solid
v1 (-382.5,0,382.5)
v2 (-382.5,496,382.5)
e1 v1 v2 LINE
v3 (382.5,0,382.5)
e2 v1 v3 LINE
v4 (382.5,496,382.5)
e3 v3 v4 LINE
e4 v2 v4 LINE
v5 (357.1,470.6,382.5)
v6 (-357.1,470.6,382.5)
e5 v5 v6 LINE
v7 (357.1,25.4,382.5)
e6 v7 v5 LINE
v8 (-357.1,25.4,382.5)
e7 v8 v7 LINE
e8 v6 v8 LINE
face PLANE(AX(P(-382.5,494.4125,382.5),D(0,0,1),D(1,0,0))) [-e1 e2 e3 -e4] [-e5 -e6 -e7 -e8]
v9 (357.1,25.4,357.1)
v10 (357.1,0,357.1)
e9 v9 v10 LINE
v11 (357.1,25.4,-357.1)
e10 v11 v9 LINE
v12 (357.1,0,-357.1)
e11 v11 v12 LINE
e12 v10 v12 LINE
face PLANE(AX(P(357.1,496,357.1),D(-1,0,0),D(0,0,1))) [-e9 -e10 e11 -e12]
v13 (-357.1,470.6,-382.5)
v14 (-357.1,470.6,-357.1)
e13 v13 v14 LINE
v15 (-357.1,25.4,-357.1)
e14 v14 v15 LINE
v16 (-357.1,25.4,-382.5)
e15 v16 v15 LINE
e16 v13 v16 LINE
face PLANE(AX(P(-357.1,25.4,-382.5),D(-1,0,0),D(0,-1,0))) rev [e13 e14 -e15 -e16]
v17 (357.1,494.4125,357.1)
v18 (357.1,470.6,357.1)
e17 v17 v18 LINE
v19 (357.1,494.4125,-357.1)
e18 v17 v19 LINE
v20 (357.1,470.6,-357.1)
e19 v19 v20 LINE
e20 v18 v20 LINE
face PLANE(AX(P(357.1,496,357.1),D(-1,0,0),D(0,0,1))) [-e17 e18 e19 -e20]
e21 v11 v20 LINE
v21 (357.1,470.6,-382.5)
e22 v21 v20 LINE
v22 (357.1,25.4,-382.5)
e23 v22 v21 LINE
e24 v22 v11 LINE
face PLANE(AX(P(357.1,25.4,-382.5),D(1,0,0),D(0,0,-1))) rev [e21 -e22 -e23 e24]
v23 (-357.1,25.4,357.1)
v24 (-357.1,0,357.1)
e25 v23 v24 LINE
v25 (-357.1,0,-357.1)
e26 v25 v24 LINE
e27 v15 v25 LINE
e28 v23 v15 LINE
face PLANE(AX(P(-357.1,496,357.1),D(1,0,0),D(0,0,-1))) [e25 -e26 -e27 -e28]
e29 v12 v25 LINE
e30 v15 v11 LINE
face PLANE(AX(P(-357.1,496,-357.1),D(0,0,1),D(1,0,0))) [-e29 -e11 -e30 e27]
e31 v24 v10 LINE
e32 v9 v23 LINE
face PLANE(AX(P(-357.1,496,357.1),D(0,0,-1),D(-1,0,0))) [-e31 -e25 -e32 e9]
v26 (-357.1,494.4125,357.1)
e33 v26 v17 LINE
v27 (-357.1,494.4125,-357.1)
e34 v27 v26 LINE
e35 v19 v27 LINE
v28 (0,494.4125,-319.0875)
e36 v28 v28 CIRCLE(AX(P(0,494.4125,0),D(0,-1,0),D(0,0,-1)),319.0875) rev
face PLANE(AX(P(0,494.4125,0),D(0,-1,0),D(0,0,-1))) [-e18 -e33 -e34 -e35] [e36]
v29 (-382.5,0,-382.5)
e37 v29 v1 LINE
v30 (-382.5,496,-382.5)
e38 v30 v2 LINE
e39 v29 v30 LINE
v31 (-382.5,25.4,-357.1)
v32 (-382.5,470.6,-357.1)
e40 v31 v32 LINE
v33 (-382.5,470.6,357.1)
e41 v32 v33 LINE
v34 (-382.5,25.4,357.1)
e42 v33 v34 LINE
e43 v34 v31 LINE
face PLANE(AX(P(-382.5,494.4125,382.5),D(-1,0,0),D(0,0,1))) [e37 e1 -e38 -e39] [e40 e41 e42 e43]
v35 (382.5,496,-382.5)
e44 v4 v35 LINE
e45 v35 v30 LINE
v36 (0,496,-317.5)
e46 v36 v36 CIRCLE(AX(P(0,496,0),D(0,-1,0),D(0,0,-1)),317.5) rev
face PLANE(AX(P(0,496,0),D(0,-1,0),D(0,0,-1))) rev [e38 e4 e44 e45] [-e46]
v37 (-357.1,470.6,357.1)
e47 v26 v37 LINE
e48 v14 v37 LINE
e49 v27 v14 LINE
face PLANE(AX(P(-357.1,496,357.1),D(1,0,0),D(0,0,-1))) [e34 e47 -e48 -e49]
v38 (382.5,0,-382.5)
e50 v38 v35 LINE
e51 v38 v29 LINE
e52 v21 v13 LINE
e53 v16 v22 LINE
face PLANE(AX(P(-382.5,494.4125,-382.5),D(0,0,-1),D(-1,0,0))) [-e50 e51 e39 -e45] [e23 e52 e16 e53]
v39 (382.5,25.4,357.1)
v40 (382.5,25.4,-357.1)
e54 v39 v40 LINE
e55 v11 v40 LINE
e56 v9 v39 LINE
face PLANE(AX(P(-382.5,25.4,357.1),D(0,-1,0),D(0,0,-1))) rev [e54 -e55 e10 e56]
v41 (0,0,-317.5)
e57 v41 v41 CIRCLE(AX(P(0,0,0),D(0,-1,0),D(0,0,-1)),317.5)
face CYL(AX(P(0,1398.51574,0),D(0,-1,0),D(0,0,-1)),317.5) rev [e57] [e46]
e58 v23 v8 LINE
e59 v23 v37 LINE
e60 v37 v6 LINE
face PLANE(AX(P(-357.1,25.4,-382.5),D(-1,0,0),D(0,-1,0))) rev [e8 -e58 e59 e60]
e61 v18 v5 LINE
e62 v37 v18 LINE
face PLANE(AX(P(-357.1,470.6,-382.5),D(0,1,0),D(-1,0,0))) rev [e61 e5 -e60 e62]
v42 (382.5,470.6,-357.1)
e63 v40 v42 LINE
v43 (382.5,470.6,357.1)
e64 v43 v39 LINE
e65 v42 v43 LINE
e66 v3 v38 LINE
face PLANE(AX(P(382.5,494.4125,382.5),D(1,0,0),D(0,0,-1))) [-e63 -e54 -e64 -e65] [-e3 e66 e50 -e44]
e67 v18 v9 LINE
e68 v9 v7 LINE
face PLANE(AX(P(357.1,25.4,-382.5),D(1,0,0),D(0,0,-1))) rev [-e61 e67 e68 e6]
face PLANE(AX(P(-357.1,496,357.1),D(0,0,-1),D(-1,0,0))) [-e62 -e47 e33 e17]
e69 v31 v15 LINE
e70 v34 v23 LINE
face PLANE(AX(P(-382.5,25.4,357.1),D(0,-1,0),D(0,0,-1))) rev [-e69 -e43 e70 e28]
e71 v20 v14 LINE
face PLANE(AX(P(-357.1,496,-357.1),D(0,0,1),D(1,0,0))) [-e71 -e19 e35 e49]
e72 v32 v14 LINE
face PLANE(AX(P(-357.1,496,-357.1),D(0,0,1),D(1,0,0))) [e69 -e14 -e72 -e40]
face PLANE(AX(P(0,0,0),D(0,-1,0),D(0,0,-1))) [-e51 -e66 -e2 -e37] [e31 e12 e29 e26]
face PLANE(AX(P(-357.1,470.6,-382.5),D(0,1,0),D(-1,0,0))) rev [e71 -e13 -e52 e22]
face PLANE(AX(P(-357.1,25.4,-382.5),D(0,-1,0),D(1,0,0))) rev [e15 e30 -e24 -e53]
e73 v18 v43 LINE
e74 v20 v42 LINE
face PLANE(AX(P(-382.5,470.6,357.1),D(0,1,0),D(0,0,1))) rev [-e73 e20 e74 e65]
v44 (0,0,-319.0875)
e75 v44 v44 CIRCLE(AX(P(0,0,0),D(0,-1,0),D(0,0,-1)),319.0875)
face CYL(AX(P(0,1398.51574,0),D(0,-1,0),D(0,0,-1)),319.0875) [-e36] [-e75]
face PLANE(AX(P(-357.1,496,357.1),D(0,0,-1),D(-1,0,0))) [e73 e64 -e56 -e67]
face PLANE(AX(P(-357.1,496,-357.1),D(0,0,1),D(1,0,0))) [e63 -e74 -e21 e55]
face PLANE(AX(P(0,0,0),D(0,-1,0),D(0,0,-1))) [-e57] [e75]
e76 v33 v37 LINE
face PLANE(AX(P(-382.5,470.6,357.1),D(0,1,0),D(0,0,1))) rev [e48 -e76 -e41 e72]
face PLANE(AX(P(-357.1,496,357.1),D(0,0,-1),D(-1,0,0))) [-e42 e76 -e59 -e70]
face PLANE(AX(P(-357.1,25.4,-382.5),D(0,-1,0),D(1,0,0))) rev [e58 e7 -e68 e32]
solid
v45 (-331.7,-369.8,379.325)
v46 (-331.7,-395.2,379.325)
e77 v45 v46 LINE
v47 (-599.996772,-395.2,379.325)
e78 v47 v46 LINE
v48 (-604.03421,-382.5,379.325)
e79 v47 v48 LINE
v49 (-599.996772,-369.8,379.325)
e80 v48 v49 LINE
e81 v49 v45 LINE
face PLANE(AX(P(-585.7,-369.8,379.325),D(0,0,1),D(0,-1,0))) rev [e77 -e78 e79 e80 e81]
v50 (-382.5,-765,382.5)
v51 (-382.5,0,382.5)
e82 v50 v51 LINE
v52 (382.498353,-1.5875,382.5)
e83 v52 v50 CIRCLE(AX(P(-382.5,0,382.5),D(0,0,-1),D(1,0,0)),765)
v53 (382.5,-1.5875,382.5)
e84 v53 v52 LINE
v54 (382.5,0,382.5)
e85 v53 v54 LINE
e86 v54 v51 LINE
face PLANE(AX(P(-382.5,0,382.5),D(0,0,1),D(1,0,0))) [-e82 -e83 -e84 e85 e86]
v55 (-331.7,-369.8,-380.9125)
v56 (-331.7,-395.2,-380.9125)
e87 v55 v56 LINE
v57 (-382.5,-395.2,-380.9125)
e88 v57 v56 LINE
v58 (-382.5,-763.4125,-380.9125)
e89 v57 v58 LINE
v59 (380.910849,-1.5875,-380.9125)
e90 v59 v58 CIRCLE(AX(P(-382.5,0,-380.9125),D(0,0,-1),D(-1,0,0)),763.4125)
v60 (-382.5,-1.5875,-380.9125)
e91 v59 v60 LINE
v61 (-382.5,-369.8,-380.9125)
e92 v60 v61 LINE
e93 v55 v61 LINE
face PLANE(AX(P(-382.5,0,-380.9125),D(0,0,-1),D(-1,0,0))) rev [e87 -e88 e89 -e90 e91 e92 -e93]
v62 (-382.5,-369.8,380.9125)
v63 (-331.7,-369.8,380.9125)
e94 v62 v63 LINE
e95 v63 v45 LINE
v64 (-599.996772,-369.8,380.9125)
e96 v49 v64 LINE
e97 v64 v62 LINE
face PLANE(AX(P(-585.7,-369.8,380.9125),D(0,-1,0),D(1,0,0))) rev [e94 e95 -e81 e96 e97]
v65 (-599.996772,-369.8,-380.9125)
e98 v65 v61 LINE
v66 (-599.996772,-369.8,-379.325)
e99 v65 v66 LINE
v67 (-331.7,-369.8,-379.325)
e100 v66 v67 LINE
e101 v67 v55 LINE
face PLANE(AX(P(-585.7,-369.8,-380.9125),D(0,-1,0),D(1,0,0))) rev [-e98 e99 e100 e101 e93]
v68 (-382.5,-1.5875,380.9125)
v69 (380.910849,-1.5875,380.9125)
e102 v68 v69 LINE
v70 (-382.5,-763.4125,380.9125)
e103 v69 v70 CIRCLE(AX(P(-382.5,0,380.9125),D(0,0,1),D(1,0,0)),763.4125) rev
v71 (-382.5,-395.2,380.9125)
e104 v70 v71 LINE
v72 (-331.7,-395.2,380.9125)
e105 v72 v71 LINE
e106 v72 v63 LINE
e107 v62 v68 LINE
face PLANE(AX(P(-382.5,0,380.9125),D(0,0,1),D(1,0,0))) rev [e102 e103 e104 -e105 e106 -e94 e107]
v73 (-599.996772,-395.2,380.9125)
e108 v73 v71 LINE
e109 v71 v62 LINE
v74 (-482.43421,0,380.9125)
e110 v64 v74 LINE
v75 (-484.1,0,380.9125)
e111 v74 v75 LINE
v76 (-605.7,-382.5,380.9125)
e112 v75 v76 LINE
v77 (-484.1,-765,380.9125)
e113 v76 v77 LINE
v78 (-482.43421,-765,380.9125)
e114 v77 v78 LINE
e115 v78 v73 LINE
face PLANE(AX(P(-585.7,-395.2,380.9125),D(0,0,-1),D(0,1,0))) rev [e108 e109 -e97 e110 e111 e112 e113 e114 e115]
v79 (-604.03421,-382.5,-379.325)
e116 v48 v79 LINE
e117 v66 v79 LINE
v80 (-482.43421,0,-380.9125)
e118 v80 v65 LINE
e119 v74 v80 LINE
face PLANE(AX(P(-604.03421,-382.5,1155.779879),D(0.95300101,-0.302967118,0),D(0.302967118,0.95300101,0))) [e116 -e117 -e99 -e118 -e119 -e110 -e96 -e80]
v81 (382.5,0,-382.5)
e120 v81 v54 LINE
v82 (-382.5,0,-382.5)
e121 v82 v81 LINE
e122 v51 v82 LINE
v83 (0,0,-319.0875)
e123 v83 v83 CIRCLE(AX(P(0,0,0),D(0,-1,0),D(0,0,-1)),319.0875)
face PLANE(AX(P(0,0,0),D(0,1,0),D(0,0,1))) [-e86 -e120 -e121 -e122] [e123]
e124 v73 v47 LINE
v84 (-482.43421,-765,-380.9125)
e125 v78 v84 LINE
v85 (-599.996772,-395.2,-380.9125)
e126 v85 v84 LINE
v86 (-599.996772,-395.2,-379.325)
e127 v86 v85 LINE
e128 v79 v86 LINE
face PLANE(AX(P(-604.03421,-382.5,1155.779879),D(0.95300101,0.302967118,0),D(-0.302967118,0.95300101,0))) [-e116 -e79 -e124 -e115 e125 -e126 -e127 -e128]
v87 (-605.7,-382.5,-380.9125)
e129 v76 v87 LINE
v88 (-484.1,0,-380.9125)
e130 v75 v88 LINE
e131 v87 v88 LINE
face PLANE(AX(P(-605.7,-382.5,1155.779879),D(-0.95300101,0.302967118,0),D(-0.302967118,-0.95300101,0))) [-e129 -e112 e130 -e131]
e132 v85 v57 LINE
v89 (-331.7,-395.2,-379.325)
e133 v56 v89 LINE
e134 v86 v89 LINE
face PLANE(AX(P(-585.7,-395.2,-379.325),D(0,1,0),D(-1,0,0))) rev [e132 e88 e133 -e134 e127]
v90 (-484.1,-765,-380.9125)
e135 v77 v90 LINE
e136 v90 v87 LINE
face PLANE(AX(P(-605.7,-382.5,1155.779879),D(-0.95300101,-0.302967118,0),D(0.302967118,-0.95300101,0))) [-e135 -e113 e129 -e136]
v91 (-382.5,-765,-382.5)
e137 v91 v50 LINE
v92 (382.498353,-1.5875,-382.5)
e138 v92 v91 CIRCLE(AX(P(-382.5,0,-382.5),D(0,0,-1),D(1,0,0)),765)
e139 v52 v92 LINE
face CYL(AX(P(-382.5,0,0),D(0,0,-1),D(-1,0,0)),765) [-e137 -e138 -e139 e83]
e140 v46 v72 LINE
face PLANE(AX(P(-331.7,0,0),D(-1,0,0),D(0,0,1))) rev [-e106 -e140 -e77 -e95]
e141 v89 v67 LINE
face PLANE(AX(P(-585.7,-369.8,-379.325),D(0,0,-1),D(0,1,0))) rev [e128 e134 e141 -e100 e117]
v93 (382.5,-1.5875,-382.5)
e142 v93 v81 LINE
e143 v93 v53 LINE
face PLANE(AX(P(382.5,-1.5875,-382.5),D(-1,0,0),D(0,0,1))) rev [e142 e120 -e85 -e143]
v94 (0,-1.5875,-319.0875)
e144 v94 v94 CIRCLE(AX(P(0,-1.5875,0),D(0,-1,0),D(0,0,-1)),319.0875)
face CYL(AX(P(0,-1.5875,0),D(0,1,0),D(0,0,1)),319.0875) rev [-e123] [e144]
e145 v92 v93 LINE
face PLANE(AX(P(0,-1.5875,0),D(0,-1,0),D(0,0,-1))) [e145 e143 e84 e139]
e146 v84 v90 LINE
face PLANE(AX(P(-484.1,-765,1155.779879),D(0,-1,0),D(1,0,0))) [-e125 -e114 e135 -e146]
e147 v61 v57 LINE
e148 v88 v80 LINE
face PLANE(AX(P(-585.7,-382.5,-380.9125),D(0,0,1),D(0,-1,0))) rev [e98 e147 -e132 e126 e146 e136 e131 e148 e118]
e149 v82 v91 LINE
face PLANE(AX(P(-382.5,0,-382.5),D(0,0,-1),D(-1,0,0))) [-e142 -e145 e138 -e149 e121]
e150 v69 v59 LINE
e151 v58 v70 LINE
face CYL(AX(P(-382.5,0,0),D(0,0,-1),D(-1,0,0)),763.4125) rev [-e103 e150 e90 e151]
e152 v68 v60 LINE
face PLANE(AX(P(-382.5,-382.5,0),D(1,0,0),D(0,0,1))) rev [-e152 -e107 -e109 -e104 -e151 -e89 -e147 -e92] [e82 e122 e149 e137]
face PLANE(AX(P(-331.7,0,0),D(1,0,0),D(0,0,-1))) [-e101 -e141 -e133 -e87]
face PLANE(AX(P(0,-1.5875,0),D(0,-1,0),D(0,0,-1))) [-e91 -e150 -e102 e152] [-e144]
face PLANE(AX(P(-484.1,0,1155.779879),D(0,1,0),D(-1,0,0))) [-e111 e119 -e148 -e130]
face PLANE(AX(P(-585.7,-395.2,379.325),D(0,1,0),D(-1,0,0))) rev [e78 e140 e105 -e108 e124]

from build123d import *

# Parameters (mm, degrees)
SKETCH1_W           = 765
SKETCH1_H           = 765
SKETCH1_W_2         = 714.2
SKETCH1_H_2         = 714.2
BOSS_EXTRUDE1_DEPTH = 496
SKETCH3_W           = 714.2
SKETCH3_H           = 445.2
CUT_EXTRUDE1_DEPTH  = 989.709891728
SKETCH4_W           = 714.2
SKETCH4_H           = 445.2
CUT_EXTRUDE2_DEPTH  = 989.709891728
SKETCH2_R           = 319.0875
SKETCH2_R_2         = 317.5
BOSS_EXTRUDE2_DEPTH = 496
SKETCH5_W           = 765
SKETCH5_H           = 765
SKETCH5_R           = 319.0875
BOSS_EXTRUDE3_DEPTH = 1.5875
SWEEP1_START        = -382.5
SWEEP1_DEPTH        = 765
SHELL2_T            = -1.5875
BOSS_EXTRUDE4_START = 1.5875
SKETCH11_W          = 765
SKETCH11_H          = 765
SKETCH11_R          = 319.0875
BOSS_EXTRUDE4_DEPTH = 1.5875
BOSS_EXTRUDE5_DEPTH = 254
BOSS_EXTRUDE6_DEPTH = 761.825
BOSS_EXTRUDE7_REACH = 1293.876
SKETCH14_W          = 1.5875
SKETCH14_H          = 25.4


# Read off the part's stored shape, not the designer's step: Sweep1
with BuildPart() as part:
    # Sketch1 → Boss-Extrude1 (new body)
    with BuildSketch(Plane(origin=(0, 0, 0), x_dir=(1, 0, 0), z_dir=(0, 1, 0))):
        Rectangle(SKETCH1_W, SKETCH1_H)
        Rectangle(SKETCH1_W_2, SKETCH1_H_2, mode=Mode.SUBTRACT)
    extrude(amount=BOSS_EXTRUDE1_DEPTH)

    # Sketch3 → Cut-Extrude1 (cut, through all)
    with BuildSketch(Plane(origin=(382.5, 0, 0), x_dir=(0, 0, -1), z_dir=(1, 0, 0))):
        with Locations((0, 248)):
            Rectangle(SKETCH3_W, SKETCH3_H)
    extrude(amount=-CUT_EXTRUDE1_DEPTH, mode=Mode.SUBTRACT)

    # Sketch4 → Cut-Extrude2 (cut, through all)
    with BuildSketch(Plane.XY.offset(382.5)):
        with Locations((0, 248)):
            Rectangle(SKETCH4_W, SKETCH4_H)
    extrude(amount=-CUT_EXTRUDE2_DEPTH, mode=Mode.SUBTRACT)



with BuildPart() as body_2:
    # Sketch2 → Boss-Extrude2 (new body)
    with BuildSketch(Plane.XZ):
        with Locations(Location((0, 0, 0), (0, 0, 270))):
            Circle(SKETCH2_R)
        with Locations(Location((0, 0, 0), (0, 0, 270))):
            Circle(SKETCH2_R_2, mode=Mode.SUBTRACT)
    extrude(amount=-BOSS_EXTRUDE2_DEPTH)


with BuildPart() as part_1:
    add(part.part)

    add(body_2.part)  # Boss-Extrude3 merges body 2
    # Sketch5 → Boss-Extrude3 (add)
    with BuildSketch(Plane(origin=(0, 496, 0), x_dir=(1, 0, 0), z_dir=(0, 1, 0))):
        Rectangle(SKETCH5_W, SKETCH5_H)
        with Locations(Location((0, 0, 0), (0, 0, 90))):
            Circle(SKETCH5_R, mode=Mode.SUBTRACT)
    extrude(amount=-BOSS_EXTRUDE3_DEPTH)


with BuildPart() as body_2_2:
    # Sweep1 outline → Sweep1 (new body)
    with BuildSketch(Plane.XY.offset(SWEEP1_START)):
        with BuildLine():
            ThreePointArc((-382.5, -765), (158.436687608, -540.936687608), (382.5, 0))
            Line((382.5, 0), (-382.5, 0))
            Line((-382.5, 0), (-382.5, -765))
        make_face()
    extrude(amount=SWEEP1_DEPTH)

    # Shell2
    shell2_openings = [body_2_2.faces().sort_by_distance(p)[0] for p in [
        (-382.5, -382.5, 0),
        (0, 0, 0),
    ]]
    offset(amount=SHELL2_T, openings=shell2_openings, kind=Kind.INTERSECTION)

    # Sketch11 → Boss-Extrude4 (add)
    with BuildSketch(Plane.XZ.offset(BOSS_EXTRUDE4_START)):
        Rectangle(SKETCH11_W, SKETCH11_H)
        with Locations(Location((0, 0, 0), (0, 0, 270))):
            Circle(SKETCH11_R, mode=Mode.SUBTRACT)
    extrude(amount=-BOSS_EXTRUDE4_DEPTH)

    # Sketch12 → Boss-Extrude5 (add)
    with BuildSketch(Plane.ZY.offset(331.7)):
        Polygon((-380.9125, -382.5), (-380.9125, -369.8), (-379.325, -369.8), (-379.325, -395.2), (-380.9125, -395.2), align=None)
        Polygon((380.9125, -369.8), (379.325, -369.8), (379.325, -395.2), (380.9125, -395.2), (380.9125, -382.5), align=None)
    extrude(amount=BOSS_EXTRUDE5_DEPTH)


with BuildPart() as body_3:
    # Sketch13 → Boss-Extrude6 (new body)
    with BuildSketch(Plane(origin=(0, 0, -380.9125), x_dir=(-1, 0, 0), z_dir=(0, 0, -1))):
        Polygon((605.7, -382.5), (484.1, -765), (482.43420953, -765), (604.03420953, -382.5), (482.43420953, 0), (484.1, 0), align=None)
    extrude(amount=-BOSS_EXTRUDE6_DEPTH)

    # Sketch14 → Boss-Extrude7 (add, up to next)
    with BuildSketch(Plane.ZY.offset(585.7), mode=Mode.PRIVATE) as boss_extrude7_sk1:
        with Locations((380.11875, -382.5)):
            Rectangle(SKETCH14_W, SKETCH14_H)
    boss_extrude7_tool1 = extrude(boss_extrude7_sk1.sketch, amount=BOSS_EXTRUDE7_REACH, mode=Mode.PRIVATE) - body_3.part
    # Sketch14 → Boss-Extrude7 (add, up to next)
    with BuildSketch(Plane.ZY.offset(585.7), mode=Mode.PRIVATE) as boss_extrude7_sk2:
        with Locations((-380.11875, -382.5)):
            Rectangle(SKETCH14_W, SKETCH14_H)
    boss_extrude7_tool2 = extrude(boss_extrude7_sk2.sketch, amount=BOSS_EXTRUDE7_REACH, mode=Mode.PRIVATE) - body_3.part

    add(body_2_2.part)  # Boss-Extrude7 merges body 2 2
    add(boss_extrude7_tool1.solids().sort_by_distance((-585.7, -382.5, 380.11875))[0])
    add(boss_extrude7_tool2.solids().sort_by_distance((-585.7, -382.5, -380.11875))[0])


solid = Compound([part_1.part, body_3.part])
